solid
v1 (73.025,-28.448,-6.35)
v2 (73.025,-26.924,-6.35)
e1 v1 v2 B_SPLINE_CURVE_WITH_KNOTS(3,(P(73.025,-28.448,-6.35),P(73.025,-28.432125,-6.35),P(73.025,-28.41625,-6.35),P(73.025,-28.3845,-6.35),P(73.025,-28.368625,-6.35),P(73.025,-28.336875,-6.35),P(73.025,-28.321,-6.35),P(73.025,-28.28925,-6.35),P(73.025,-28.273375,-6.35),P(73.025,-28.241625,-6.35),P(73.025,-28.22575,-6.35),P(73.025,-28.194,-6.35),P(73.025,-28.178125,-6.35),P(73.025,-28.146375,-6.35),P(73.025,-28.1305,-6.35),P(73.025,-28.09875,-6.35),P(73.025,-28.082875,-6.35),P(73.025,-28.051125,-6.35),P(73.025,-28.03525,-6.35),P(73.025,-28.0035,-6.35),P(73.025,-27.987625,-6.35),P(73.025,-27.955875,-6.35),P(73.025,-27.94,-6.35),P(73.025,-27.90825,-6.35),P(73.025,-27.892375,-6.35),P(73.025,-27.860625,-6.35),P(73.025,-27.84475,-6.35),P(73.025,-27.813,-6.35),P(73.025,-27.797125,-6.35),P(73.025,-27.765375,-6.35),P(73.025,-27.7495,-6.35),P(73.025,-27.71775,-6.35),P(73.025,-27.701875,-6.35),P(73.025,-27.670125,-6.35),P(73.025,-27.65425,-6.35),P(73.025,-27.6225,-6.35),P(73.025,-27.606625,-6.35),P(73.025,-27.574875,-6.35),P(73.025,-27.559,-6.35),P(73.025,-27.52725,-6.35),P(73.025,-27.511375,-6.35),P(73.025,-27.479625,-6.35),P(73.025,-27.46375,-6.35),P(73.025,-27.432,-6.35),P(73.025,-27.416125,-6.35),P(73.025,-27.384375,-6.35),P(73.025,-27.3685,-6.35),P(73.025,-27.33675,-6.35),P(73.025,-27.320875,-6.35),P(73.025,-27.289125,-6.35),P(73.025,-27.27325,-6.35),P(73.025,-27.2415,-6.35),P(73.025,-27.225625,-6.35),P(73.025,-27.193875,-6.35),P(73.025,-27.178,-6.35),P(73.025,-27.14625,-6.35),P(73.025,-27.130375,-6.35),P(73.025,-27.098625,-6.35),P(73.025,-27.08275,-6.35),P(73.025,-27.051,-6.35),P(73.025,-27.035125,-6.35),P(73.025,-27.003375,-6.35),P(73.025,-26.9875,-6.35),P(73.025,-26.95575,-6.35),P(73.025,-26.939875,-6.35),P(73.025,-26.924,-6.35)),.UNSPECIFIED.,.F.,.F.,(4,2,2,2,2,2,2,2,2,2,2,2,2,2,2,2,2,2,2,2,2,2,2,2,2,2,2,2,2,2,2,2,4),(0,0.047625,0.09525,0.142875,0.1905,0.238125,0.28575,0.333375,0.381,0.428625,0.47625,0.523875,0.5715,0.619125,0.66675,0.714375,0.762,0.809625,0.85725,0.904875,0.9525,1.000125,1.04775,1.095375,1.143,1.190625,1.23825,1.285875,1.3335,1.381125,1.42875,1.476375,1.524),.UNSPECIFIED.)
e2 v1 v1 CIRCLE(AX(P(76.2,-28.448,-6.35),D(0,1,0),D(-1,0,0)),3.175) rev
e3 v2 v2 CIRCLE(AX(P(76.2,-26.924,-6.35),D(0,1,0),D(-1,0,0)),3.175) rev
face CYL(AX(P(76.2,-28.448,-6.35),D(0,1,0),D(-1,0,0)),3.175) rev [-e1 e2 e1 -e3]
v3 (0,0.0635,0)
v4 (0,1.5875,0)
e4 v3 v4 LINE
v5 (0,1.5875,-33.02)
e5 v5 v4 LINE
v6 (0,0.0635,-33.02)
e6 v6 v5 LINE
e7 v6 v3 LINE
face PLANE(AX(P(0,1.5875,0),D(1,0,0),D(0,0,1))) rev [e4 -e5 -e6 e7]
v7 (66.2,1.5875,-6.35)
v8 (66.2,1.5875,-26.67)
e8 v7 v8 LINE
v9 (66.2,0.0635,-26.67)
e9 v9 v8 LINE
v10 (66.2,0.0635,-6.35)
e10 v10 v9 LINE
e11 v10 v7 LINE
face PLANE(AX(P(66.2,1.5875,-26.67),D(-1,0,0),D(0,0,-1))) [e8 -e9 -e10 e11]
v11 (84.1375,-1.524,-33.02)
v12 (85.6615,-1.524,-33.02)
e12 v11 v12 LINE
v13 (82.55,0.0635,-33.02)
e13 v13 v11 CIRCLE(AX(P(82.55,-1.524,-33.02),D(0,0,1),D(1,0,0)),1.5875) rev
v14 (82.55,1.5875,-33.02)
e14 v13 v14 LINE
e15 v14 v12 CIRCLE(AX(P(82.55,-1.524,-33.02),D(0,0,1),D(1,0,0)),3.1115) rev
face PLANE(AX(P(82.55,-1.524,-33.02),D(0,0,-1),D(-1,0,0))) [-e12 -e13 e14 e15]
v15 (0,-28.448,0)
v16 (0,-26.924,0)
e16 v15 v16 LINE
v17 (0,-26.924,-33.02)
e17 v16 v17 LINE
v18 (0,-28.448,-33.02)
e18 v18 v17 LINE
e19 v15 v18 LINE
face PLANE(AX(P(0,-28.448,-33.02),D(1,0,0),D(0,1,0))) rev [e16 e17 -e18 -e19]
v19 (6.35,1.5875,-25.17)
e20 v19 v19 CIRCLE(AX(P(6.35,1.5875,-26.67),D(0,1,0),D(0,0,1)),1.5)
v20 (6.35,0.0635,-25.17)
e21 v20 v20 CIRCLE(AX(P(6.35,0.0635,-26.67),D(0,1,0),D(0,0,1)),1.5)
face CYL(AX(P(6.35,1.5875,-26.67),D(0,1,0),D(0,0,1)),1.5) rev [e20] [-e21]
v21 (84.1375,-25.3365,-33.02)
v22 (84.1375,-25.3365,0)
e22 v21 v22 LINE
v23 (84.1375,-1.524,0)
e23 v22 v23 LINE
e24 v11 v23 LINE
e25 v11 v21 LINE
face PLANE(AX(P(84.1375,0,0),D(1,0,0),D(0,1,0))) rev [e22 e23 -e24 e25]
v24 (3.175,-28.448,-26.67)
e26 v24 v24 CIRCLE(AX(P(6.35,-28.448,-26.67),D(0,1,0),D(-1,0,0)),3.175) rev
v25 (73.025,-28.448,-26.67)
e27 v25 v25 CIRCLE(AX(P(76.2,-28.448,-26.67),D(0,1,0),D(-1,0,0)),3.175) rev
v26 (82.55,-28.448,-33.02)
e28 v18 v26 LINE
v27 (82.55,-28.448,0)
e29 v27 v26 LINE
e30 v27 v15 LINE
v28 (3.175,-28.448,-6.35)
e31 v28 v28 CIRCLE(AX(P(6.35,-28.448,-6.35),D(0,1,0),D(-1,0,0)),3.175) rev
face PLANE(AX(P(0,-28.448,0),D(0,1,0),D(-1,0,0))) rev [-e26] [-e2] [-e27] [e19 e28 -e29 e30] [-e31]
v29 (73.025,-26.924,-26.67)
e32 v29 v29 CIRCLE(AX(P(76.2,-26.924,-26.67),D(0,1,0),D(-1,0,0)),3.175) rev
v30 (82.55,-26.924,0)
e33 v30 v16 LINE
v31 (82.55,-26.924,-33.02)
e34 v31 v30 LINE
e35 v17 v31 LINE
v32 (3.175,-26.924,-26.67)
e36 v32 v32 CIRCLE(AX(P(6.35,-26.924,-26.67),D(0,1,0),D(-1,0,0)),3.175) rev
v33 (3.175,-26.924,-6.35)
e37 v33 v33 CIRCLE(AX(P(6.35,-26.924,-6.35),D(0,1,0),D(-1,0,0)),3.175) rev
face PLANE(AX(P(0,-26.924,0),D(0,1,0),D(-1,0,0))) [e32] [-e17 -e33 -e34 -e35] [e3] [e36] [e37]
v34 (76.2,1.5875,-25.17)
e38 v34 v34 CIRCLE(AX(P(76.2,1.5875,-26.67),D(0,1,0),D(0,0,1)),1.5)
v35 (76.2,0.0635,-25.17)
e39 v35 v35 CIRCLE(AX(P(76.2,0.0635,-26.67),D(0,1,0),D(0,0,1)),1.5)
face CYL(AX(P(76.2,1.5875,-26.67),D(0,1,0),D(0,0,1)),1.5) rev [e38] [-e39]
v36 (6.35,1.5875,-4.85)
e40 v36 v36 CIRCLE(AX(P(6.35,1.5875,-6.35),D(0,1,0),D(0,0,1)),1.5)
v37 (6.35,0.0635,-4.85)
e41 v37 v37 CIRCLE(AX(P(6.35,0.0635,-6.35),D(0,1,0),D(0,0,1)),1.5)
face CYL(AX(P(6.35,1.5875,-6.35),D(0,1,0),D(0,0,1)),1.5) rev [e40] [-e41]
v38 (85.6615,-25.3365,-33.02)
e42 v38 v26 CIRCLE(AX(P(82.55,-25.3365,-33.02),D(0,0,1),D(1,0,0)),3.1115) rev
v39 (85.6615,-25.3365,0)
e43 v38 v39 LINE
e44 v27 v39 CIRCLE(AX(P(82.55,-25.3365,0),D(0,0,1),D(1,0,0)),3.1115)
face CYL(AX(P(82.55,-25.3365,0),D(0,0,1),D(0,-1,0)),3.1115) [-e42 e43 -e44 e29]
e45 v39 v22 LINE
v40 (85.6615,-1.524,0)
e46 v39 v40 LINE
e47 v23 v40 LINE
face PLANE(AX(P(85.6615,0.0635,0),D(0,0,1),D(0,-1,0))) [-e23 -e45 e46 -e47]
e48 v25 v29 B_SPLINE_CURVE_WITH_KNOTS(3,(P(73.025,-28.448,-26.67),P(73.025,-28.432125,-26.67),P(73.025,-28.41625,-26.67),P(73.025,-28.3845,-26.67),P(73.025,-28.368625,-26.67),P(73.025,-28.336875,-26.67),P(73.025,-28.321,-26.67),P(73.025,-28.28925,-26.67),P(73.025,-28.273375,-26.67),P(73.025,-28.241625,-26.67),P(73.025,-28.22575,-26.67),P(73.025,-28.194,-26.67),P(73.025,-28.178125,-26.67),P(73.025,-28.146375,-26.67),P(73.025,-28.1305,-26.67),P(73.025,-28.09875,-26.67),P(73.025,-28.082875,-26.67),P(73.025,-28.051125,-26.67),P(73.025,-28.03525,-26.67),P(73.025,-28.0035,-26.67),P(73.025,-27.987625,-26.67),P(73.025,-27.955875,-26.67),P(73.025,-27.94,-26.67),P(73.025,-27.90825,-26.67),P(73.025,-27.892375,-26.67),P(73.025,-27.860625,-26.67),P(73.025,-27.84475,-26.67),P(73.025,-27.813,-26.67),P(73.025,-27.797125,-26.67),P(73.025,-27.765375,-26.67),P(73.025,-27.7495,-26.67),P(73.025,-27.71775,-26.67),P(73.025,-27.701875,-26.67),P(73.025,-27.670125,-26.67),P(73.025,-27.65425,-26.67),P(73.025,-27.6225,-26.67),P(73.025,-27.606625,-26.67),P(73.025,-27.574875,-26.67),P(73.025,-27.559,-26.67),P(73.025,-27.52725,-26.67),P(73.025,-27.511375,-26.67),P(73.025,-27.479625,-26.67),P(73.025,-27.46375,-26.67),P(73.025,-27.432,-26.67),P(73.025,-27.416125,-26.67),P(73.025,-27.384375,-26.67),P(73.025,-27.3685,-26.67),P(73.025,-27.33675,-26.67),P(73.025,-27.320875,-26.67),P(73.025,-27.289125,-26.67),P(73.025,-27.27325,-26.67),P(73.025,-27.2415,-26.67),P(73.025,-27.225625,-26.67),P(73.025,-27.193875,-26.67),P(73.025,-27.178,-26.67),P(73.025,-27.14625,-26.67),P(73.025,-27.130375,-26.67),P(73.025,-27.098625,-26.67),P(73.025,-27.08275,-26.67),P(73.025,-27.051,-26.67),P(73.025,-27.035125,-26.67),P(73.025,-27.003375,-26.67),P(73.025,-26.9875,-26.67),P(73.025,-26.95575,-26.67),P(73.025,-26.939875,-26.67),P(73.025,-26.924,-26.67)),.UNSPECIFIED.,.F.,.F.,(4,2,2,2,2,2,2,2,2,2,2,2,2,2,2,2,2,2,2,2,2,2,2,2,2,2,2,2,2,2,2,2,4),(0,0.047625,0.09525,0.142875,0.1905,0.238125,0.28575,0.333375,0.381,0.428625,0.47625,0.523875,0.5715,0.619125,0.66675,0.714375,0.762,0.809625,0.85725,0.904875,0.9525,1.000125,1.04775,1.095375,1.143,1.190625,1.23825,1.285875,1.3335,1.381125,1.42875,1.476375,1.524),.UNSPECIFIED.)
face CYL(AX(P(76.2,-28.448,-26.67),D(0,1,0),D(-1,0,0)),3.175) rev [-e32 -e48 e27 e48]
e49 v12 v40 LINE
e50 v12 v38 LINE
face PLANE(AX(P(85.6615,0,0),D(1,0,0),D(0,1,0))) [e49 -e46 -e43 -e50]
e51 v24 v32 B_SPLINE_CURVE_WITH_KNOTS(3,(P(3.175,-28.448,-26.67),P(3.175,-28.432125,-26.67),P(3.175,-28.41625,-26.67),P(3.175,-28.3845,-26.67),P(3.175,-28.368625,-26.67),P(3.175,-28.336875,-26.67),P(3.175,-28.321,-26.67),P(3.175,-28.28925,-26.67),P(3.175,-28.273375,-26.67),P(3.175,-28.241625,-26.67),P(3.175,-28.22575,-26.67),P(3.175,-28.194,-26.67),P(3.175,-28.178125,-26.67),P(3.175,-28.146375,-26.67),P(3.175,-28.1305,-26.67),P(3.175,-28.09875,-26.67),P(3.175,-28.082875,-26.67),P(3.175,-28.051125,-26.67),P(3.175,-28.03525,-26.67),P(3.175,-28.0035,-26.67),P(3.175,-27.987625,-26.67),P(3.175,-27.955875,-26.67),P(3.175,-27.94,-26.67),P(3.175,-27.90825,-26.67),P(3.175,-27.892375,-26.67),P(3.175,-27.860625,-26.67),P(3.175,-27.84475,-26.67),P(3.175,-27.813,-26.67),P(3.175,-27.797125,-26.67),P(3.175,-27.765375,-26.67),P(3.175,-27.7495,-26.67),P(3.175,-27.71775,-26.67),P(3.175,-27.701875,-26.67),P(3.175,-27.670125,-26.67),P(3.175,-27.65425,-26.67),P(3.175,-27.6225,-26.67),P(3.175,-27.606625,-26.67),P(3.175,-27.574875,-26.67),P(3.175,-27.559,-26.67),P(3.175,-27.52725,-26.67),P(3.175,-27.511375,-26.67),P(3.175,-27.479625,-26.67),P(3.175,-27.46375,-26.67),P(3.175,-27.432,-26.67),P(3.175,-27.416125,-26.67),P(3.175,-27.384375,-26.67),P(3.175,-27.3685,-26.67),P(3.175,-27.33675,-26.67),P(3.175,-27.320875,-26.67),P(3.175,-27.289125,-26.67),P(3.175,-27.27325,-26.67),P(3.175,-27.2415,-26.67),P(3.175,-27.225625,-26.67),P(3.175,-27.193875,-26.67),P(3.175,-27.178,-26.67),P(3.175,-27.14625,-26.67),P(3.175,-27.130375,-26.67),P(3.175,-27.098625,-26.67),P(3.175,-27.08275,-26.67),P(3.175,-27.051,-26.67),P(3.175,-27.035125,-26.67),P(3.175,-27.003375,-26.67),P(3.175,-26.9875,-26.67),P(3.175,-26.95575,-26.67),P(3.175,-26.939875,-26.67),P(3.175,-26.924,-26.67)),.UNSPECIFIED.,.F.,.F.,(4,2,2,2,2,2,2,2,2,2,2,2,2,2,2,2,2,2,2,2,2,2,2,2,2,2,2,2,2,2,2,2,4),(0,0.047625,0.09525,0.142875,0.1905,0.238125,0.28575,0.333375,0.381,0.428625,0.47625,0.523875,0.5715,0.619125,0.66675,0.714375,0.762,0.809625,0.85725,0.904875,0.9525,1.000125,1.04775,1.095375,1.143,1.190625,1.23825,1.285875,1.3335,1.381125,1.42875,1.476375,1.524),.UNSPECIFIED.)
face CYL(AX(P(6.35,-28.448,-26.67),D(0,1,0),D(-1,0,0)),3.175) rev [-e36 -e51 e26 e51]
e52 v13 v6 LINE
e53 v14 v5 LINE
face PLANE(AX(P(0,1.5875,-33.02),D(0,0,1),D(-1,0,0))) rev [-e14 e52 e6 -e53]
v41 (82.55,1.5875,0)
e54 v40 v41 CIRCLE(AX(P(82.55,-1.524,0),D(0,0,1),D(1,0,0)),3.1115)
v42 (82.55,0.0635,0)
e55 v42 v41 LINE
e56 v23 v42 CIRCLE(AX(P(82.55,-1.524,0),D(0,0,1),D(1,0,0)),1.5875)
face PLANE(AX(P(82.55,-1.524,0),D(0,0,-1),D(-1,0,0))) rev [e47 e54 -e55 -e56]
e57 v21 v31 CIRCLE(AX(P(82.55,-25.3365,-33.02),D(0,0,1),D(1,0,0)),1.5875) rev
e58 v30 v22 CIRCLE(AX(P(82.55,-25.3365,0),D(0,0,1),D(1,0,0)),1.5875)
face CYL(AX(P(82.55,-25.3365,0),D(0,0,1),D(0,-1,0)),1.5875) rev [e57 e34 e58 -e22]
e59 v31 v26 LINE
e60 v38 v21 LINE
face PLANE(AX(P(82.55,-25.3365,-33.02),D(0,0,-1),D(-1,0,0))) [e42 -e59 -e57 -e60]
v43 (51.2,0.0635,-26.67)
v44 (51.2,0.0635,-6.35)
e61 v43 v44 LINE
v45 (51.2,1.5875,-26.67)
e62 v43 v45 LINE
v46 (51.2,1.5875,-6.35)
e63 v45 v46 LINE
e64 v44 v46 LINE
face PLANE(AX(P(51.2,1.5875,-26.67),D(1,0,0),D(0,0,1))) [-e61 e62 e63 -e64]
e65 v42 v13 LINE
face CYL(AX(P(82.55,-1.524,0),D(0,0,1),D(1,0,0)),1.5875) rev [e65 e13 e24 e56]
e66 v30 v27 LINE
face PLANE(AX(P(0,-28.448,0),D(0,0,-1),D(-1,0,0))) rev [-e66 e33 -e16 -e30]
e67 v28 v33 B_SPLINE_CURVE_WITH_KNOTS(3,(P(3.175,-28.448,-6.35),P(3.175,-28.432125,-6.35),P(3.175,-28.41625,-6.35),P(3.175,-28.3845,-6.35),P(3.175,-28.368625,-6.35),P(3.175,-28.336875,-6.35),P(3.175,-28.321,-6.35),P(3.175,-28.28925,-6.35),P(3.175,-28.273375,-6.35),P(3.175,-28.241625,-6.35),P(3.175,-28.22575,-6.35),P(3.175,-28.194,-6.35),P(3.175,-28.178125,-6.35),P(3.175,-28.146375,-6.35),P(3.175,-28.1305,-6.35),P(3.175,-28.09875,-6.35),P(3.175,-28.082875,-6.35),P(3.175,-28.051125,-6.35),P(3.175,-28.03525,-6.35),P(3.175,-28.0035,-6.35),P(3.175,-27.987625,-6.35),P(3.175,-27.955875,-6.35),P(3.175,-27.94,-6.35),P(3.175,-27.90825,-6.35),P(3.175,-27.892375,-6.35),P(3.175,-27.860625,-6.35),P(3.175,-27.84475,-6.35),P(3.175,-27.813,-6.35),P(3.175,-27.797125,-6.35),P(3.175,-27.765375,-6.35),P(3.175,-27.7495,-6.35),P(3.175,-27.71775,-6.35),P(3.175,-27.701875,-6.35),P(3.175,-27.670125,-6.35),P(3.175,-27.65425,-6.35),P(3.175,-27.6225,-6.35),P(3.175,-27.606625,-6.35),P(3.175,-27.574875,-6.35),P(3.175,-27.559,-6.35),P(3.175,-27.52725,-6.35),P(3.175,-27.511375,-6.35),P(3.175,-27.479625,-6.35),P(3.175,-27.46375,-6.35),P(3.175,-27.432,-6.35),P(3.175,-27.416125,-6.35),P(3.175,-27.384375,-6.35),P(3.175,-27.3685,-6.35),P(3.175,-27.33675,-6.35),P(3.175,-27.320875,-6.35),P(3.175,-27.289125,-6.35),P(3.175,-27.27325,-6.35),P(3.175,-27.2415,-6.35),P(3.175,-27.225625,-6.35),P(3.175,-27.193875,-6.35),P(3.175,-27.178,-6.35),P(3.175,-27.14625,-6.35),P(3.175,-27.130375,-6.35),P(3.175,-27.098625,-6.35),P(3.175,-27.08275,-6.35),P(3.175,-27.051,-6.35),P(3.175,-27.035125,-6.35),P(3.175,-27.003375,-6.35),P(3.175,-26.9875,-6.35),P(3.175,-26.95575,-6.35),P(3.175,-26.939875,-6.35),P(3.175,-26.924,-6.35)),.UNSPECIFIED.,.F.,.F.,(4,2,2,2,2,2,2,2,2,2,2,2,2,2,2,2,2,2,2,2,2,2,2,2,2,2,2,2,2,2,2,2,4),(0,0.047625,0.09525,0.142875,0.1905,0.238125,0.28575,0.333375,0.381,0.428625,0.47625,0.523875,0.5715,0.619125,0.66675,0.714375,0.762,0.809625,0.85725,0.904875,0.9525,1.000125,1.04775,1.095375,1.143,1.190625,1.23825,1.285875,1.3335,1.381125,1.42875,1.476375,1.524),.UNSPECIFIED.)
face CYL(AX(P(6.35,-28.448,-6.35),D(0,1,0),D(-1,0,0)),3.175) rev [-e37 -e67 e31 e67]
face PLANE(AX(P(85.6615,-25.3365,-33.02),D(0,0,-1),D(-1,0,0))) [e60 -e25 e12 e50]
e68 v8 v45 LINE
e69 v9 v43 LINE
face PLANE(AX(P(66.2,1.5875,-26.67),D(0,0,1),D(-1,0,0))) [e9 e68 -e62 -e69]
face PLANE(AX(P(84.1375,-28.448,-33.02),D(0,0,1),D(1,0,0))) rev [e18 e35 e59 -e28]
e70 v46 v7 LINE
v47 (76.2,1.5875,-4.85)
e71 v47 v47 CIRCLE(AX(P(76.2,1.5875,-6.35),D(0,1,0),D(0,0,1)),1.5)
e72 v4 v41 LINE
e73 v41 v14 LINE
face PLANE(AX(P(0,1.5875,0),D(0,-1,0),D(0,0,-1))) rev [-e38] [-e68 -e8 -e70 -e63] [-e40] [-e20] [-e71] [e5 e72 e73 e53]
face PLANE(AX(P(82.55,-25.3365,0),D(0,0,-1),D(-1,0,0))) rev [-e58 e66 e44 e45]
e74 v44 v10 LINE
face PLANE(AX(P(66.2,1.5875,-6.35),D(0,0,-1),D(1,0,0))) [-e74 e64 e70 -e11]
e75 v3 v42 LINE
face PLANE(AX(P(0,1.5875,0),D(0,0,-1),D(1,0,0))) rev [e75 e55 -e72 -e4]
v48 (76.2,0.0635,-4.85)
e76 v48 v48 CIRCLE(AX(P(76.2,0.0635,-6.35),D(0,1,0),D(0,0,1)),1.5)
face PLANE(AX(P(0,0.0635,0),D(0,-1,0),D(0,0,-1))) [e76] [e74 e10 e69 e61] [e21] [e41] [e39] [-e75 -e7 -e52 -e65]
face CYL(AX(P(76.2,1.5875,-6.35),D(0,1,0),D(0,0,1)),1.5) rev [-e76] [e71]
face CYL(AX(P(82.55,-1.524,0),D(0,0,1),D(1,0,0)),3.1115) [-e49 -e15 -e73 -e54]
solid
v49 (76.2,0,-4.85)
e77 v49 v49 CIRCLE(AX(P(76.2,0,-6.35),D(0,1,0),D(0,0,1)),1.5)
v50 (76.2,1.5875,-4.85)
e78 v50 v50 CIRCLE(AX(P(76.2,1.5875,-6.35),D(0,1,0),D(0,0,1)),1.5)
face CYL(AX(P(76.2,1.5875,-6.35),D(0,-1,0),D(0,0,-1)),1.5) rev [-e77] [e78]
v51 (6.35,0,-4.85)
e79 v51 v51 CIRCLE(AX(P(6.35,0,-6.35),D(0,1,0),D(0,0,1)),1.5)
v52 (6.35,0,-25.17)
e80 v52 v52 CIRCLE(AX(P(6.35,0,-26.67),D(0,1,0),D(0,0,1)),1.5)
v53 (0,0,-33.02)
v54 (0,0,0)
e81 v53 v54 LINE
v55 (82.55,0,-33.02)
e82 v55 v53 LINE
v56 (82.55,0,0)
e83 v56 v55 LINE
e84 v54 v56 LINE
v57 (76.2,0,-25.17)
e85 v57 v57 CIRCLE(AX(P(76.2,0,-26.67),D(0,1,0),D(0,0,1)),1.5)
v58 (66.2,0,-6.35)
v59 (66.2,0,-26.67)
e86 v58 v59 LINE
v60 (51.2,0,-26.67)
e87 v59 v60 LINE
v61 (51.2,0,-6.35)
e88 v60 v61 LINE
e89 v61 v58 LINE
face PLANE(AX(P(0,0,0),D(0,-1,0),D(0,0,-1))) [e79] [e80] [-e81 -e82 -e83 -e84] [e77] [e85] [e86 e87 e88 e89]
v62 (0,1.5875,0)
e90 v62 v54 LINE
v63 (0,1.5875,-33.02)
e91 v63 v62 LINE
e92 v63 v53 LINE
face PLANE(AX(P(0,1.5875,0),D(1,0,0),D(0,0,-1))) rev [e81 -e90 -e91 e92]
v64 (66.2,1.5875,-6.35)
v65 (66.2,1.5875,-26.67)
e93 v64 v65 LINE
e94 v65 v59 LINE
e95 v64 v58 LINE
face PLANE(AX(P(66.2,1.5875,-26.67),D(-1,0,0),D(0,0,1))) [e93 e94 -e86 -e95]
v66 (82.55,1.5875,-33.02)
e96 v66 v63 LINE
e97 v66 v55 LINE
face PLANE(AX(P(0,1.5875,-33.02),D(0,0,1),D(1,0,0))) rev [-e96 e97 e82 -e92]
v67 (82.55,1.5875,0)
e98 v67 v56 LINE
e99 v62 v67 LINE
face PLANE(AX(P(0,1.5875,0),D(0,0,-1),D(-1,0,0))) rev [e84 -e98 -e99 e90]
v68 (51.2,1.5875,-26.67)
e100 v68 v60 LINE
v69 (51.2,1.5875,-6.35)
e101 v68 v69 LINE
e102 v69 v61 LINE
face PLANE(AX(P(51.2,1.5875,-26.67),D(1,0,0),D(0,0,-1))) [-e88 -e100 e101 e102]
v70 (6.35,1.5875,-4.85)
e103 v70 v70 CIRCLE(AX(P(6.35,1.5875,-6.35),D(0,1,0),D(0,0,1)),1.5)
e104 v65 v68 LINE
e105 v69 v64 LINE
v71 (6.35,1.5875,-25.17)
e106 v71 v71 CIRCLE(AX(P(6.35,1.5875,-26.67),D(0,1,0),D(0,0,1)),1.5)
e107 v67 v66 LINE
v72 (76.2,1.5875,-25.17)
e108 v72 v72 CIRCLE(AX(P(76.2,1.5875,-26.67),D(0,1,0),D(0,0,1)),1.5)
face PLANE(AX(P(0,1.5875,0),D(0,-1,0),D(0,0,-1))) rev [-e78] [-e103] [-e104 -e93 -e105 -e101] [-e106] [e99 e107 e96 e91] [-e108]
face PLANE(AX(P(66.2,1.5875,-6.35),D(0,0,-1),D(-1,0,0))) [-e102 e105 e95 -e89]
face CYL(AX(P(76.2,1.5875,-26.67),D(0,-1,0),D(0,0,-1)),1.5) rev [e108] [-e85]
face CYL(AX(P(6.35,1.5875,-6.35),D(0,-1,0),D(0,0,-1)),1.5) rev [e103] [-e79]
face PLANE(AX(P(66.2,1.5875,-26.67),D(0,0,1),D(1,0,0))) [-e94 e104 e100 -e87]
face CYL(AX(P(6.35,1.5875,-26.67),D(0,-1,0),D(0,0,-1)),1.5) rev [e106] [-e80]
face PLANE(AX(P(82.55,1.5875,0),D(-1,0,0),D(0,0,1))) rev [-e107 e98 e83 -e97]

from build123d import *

# Parameters (mm, degrees)
ESQUISSE1_W                      = 82.55
ESQUISSE1_H                      = 33.02
ESQUISSE1_R                      = 1.5
ESQUISSE1_W_2                    = 15
ESQUISSE1_H_2                    = 20.32
BOSS_EXTRU_1_DEPTH               = 1.5875
CONVERTIR_VOLUME1_START          = 0.0635
CONVERTIR_VOLUME1_OUTLINE_W      = 82.55
CONVERTIR_VOLUME1_OUTLINE_H      = 33.02
CONVERTIR_VOLUME1_OUTLINE_R      = 1.5
CONVERTIR_VOLUME1_OUTLINE_W_2    = 15
CONVERTIR_VOLUME1_OUTLINE_H_2    = 20.32
CONVERTIR_VOLUME1_DEPTH          = 1.524
T_LE_PLI_E_SUR_AR_TE3_DEPTH      = 33.02
T_LE_PLI_E_SUR_AR_TE4_DEPTH      = 33.02
T_LE_START                       = 1.524
T_LE_PLI_E_SUR_AR_TE4_PROFILE_W  = 33.02
T_LE_PLI_E_SUR_AR_TE4_PROFILE_H  = 82.55
T_LE_PLI_E_SUR_AR_TE4_PROFILE_R  = 3.175
T_LE_PLI_E_SUR_AR_TE4_FLAT_DEPTH = 1.524


# Read off the part's stored shape, not the designer's step: Convertir-Volume1
# Sheet-metal steps are written as plain solids
with BuildPart() as part:
    # Esquisse1 → Boss.-Extru.1 (new body)
    with BuildSketch(Plane(origin=(0, 0, 0), x_dir=(1, 0, 0), z_dir=(0, 1, 0))):
        with Locations((41.275, 16.51)):
            Rectangle(ESQUISSE1_W, ESQUISSE1_H)
        with Locations(Location((6.35, 26.67, 0), (0, 0, 270))):
            Circle(ESQUISSE1_R, mode=Mode.SUBTRACT)
        with Locations(Location((76.2, 26.67, 0), (0, 0, 270))):
            Circle(ESQUISSE1_R, mode=Mode.SUBTRACT)
        with Locations(Location((76.2, 6.349999837, 0), (0, 0, 270))):
            Circle(ESQUISSE1_R, mode=Mode.SUBTRACT)
        with Locations(Location((6.35, 6.349999837, 0), (0, 0, 270))):
            Circle(ESQUISSE1_R, mode=Mode.SUBTRACT)
        with Locations((58.7, 16.51)):
            Rectangle(ESQUISSE1_W_2, ESQUISSE1_H_2, mode=Mode.SUBTRACT)
    extrude(amount=BOSS_EXTRU_1_DEPTH)


with BuildPart() as body_2:
    # Convertir-Volume1 outline → Convertir-Volume1 (new body)
    with BuildSketch(Plane(origin=(0, 0, 0), x_dir=(1, 0, 0), z_dir=(0, 1, 0)).offset(CONVERTIR_VOLUME1_START)):
        with Locations((41.275, 16.51)):
            Rectangle(CONVERTIR_VOLUME1_OUTLINE_W, CONVERTIR_VOLUME1_OUTLINE_H)
        with Locations((6.35, 6.349999837)):
            Circle(CONVERTIR_VOLUME1_OUTLINE_R, mode=Mode.SUBTRACT)
        with Locations((76.2, 6.349999837)):
            Circle(CONVERTIR_VOLUME1_OUTLINE_R, mode=Mode.SUBTRACT)
        with Locations((6.35, 26.67)):
            Circle(CONVERTIR_VOLUME1_OUTLINE_R, mode=Mode.SUBTRACT)
        with Locations((58.7, 16.51)):
            Rectangle(CONVERTIR_VOLUME1_OUTLINE_W_2, CONVERTIR_VOLUME1_OUTLINE_H_2, mode=Mode.SUBTRACT)
        with Locations((76.2, 26.67)):
            Circle(CONVERTIR_VOLUME1_OUTLINE_R, mode=Mode.SUBTRACT)
    extrude(amount=CONVERTIR_VOLUME1_DEPTH)

    # Tôle pliée sur arête3 section (across the edge) → Tôle pliée sur arête3 (add)
    with BuildSketch(Plane(origin=(84.1375, 0.0635, -33.02), x_dir=(-1, 0, 0), z_dir=(0, 0, 1))):
        with BuildLine():
            Line((-1.524, 1.5875), (-1.524, 25.4))
            Line((-1.524, 25.4), (0, 25.4))
            Line((0, 25.4), (0, 1.5875))
            ThreePointArc((0, 1.5875), (0.464967985, 0.464967985), (1.5875, 0))
            Line((1.5875, 0), (1.5875, -1.524))
            ThreePointArc((1.5875, -1.524), (-0.61266275, -0.61266275), (-1.524, 1.5875))
        make_face()
    extrude(amount=T_LE_PLI_E_SUR_AR_TE3_DEPTH)

    # Tôle pliée sur arête4 bend section (across the edge) → Tôle pliée sur arête4 (add)
    with BuildSketch(Plane(origin=(84.1375, -26.924, -33.02), x_dir=(0, 1, 0), z_dir=(0, 0, 1))):
        with BuildLine():
            Line((-1.524, 1.5875), (0, 1.5875))
            ThreePointArc((0, 1.5875), (0.464967985, 0.464967985), (1.5875, 0))
            Line((1.5875, 0), (1.5875, -1.524))
            ThreePointArc((1.5875, -1.524), (-0.61266275, -0.61266275), (-1.524, 1.5875))
        make_face()
    extrude(amount=T_LE_PLI_E_SUR_AR_TE4_DEPTH)

    # Tôle pliée sur arête4 profile (on flange) → Tôle pliée sur arête4 flat (add)
    with BuildSketch(Plane(origin=(84.1375, -26.924, 0), x_dir=(0, 0, 1), z_dir=(0, -1, 0)).offset(T_LE_START)):
        with Locations((-16.51, 42.8625)):
            Rectangle(T_LE_PLI_E_SUR_AR_TE4_PROFILE_W, T_LE_PLI_E_SUR_AR_TE4_PROFILE_H)
        with Locations((-26.67, 7.9375)):
            Circle(T_LE_PLI_E_SUR_AR_TE4_PROFILE_R, mode=Mode.SUBTRACT)
        with Locations((-6.35, 7.9375)):
            Circle(T_LE_PLI_E_SUR_AR_TE4_PROFILE_R, mode=Mode.SUBTRACT)
        with Locations((-26.67, 77.7875)):
            Circle(T_LE_PLI_E_SUR_AR_TE4_PROFILE_R, mode=Mode.SUBTRACT)
        with Locations((-6.35, 77.7875)):
            Circle(T_LE_PLI_E_SUR_AR_TE4_PROFILE_R, mode=Mode.SUBTRACT)
    extrude(amount=-T_LE_PLI_E_SUR_AR_TE4_FLAT_DEPTH)


solid = Compound([part.part, body_2.part])
